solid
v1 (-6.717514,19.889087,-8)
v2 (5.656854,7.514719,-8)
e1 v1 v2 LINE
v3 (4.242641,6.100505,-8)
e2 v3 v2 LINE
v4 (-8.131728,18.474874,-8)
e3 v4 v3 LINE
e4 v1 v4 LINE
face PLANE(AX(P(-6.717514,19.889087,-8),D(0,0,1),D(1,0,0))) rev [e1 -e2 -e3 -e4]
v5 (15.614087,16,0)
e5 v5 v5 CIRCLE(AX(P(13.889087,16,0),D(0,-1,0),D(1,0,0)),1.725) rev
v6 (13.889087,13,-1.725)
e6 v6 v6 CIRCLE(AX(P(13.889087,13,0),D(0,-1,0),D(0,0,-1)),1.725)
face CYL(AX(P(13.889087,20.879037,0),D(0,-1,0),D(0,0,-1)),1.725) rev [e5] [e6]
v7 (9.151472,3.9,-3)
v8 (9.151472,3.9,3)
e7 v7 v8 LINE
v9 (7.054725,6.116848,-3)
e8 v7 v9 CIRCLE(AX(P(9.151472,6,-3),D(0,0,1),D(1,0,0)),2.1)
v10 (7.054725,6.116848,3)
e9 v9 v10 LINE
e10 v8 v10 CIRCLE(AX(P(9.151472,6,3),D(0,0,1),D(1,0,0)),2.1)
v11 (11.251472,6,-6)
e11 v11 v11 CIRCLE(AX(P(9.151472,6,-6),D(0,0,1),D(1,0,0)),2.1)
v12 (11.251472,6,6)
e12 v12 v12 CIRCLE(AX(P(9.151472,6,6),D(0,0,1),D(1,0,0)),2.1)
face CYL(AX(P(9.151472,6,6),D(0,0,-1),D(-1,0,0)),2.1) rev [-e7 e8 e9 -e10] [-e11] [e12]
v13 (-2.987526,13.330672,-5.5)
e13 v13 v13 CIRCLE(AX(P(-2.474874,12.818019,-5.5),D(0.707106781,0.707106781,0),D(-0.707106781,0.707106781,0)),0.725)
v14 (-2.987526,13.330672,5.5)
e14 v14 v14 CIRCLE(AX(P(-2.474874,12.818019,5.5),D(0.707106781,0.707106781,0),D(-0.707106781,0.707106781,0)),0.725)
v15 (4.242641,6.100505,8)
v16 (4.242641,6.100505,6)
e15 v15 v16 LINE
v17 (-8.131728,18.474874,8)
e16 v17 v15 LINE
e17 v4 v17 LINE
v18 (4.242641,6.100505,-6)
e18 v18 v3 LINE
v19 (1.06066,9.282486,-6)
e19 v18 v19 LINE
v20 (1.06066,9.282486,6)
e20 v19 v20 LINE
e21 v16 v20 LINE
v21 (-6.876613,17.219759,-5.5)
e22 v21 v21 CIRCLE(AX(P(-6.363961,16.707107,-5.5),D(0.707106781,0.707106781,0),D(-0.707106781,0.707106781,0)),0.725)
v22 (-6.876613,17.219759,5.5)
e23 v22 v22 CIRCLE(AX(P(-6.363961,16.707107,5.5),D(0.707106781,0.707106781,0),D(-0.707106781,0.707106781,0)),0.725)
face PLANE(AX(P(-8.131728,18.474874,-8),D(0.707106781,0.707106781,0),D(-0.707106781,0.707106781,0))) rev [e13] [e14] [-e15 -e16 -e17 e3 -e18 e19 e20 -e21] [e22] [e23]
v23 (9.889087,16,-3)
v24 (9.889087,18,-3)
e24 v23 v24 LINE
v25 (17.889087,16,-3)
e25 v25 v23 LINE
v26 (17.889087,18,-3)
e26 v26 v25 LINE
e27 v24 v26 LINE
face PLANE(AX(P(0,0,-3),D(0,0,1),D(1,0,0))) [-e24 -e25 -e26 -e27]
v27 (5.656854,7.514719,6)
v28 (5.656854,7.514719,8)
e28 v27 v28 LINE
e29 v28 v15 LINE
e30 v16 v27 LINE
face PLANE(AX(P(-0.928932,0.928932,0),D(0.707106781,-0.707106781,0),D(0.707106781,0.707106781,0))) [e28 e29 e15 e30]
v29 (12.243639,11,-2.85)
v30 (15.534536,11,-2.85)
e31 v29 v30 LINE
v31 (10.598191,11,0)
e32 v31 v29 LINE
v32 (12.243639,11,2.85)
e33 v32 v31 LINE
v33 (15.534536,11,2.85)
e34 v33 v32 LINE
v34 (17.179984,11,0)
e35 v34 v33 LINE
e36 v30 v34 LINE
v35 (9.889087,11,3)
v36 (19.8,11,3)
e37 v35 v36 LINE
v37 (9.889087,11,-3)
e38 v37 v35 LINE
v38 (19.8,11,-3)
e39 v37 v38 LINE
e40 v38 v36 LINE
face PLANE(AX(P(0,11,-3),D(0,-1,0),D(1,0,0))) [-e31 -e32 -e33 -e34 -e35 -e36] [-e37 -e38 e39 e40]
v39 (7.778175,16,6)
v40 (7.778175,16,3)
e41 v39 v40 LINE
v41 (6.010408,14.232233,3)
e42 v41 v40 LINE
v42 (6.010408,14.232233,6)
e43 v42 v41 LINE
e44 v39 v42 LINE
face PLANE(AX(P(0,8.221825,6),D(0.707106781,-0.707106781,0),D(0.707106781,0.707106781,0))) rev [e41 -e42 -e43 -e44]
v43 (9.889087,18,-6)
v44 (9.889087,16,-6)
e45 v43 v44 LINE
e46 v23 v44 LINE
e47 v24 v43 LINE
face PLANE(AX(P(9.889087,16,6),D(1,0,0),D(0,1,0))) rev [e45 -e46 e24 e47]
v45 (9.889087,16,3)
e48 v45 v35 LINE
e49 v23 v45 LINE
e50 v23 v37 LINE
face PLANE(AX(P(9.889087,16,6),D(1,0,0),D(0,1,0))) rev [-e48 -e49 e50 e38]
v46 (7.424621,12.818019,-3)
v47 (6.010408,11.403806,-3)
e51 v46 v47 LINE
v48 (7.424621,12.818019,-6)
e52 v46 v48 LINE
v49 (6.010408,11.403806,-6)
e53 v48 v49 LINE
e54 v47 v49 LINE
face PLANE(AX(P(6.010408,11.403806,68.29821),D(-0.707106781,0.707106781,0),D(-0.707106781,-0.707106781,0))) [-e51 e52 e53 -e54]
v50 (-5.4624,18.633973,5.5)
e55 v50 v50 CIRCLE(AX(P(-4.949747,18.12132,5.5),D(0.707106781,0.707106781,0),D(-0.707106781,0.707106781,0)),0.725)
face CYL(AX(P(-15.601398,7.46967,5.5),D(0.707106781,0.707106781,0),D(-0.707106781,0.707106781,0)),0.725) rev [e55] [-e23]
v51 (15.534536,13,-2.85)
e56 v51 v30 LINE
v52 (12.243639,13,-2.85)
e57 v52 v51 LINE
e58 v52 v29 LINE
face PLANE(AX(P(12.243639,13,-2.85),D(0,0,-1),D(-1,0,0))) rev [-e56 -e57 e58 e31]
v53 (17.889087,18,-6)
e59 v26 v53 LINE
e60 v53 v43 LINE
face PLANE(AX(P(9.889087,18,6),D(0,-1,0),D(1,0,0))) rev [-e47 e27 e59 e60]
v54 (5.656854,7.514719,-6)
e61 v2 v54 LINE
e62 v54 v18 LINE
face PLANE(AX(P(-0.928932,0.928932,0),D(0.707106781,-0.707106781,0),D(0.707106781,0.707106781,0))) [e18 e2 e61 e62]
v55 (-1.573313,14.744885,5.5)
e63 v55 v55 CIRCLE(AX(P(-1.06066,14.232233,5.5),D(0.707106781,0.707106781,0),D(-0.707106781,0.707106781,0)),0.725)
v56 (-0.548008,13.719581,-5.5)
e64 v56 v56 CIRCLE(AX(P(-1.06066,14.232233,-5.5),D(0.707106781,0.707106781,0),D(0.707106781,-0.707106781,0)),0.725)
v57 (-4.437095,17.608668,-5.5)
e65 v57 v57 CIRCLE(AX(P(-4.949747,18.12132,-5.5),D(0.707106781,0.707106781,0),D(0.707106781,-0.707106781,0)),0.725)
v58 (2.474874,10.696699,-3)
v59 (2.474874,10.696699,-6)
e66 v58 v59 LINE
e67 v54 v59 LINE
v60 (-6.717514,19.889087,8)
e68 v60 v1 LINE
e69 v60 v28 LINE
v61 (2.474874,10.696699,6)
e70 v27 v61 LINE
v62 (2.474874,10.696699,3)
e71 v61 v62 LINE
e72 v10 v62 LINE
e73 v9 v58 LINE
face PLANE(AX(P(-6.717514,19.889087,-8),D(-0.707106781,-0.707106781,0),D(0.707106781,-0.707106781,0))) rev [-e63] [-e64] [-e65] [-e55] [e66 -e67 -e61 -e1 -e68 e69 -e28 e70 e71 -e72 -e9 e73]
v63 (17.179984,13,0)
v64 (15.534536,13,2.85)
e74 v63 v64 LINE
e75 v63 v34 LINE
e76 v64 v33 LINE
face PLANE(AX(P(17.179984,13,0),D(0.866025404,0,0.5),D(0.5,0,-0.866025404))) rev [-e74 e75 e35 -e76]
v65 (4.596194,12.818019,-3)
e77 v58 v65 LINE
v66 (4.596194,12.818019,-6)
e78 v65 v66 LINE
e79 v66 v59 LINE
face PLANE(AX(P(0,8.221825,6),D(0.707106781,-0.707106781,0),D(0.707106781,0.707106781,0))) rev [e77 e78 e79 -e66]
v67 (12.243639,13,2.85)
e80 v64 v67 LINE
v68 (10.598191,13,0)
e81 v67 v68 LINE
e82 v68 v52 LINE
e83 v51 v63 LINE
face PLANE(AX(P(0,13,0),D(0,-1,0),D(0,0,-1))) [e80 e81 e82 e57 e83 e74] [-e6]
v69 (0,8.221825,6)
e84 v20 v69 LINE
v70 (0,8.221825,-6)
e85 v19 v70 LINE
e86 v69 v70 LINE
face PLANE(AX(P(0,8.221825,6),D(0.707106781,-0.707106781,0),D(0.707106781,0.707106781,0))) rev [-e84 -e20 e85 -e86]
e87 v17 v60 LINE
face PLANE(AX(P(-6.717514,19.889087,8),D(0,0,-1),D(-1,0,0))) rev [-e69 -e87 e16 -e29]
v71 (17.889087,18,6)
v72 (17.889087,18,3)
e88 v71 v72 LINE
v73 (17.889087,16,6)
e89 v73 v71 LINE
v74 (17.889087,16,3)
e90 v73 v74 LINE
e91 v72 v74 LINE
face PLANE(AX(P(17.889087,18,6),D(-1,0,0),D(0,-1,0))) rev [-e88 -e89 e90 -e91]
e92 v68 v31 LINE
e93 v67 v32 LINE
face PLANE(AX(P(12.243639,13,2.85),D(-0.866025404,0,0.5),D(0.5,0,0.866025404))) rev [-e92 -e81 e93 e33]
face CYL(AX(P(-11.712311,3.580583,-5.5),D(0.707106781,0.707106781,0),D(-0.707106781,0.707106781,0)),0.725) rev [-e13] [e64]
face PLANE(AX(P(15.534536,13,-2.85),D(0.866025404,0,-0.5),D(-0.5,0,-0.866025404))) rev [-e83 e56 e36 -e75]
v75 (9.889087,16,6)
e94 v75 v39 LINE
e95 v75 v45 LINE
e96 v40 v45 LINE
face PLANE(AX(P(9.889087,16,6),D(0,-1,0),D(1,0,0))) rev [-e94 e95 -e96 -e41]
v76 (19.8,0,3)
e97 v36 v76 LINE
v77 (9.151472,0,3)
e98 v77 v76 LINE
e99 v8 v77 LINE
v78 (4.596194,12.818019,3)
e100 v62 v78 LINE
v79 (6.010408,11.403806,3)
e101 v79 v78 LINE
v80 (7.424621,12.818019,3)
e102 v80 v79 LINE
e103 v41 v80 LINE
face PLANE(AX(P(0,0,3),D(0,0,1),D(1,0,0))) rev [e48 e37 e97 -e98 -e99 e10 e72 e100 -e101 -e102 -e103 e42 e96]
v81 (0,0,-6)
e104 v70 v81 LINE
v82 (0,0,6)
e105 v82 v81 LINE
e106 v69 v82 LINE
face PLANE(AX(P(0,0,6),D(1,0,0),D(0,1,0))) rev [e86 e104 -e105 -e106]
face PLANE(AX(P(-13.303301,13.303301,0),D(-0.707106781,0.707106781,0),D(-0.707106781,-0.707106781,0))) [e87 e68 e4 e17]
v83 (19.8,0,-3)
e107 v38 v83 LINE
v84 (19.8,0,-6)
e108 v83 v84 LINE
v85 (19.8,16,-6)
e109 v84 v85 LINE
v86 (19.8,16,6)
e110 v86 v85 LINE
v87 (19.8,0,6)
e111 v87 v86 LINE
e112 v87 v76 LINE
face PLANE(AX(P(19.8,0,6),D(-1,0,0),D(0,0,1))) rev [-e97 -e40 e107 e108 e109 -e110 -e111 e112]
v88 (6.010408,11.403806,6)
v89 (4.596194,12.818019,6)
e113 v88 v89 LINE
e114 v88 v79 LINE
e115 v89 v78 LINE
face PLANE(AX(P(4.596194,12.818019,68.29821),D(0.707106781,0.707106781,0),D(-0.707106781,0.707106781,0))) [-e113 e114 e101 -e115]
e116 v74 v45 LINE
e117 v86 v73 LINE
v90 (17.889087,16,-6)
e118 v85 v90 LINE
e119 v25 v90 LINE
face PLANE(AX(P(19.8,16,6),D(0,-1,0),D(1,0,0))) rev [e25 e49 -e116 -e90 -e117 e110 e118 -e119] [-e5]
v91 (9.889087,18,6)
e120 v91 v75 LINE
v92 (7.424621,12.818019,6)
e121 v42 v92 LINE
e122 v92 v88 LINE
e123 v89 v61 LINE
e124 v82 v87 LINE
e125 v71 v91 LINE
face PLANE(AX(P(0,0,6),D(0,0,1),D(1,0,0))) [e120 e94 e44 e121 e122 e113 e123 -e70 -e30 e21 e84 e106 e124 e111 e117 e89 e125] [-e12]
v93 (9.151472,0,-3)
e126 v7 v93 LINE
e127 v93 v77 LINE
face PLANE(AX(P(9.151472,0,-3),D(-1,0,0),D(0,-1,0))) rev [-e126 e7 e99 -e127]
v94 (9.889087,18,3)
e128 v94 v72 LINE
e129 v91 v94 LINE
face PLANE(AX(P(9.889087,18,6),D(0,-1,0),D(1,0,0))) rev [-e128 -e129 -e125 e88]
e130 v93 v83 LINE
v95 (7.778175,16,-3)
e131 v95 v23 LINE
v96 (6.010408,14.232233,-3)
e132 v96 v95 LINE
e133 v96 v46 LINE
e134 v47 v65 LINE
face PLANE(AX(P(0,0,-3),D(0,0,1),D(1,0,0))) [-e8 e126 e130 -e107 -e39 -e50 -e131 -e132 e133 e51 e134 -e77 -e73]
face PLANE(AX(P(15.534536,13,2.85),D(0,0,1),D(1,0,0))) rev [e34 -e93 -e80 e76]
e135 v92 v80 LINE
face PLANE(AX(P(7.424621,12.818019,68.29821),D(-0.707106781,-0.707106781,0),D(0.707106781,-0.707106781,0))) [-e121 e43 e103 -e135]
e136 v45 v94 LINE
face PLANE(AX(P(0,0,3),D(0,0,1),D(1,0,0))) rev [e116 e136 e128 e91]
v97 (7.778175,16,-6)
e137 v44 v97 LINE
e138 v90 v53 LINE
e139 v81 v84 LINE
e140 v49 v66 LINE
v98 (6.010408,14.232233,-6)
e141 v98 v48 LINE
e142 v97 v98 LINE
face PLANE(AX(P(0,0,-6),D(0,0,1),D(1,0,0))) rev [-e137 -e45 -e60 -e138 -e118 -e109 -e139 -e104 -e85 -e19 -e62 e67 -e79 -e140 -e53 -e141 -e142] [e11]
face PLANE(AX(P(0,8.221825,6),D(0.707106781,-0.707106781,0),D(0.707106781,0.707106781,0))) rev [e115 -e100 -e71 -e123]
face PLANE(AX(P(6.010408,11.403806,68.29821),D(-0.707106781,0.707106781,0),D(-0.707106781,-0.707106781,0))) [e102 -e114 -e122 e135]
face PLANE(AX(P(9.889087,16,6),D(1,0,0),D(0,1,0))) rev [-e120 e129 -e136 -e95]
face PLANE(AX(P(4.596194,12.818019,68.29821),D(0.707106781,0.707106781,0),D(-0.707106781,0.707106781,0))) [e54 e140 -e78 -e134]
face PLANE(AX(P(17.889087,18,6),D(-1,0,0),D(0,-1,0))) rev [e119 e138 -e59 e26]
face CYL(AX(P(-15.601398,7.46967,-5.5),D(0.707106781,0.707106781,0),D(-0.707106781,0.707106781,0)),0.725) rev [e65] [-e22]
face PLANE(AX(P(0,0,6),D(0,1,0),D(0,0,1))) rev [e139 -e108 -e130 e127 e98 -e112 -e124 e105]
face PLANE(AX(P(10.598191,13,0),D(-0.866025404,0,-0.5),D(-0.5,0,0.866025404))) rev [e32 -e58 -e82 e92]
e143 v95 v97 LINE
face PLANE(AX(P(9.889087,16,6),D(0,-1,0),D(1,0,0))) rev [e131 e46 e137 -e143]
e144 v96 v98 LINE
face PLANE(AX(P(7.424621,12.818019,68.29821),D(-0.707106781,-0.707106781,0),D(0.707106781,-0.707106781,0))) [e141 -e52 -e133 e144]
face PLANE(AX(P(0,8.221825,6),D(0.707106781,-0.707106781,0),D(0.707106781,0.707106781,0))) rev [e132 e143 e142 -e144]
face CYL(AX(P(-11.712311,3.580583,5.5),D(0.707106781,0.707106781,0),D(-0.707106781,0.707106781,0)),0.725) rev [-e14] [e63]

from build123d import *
from build123d.topology import SkipClean

# Parameters (mm, degrees)
SKETCH1_R                        = 2.1
FINGER_BASE_1_DEPTH              = 6
SKETCH2_W                        = 16
SKETCH2_H                        = 2
FLEXURE_JOINT_BASE_DEPTH         = 13
SKETCH3_W                        = 8
SKETCH3_H                        = 2
PULLEY_HOUSING_DEPTH             = 3
M3_NUT_DEPTH                     = 2
SKETCH5_R                        = 1.725
M3_HOLE_DEPTH                    = 3
SKETCH9_W                        = 2
SKETCH9_H                        = 2
SUPPORT_FLEXURE_JOINT_BASE_DEPTH = 4.5
SKETCH10_R                       = 0.725
HOLE_FOR_STICHING_DEPTH          = 22.391190815
CUT_EXTRUDE1_DEPTH               = 32.362649657
CUT_EXTRUDE1_DEPTH_BACK          = 32.362649657


with BuildPart() as part:
    # Sketch1 → Finger Base 1 (new, symmetric)
    with BuildSketch(Plane.XY):
        Polygon((0, 8.221825407), (7.778174593, 16), (9.889087297, 16), (9.889087297, 18), (17.889087297, 18), (17.889087297, 16), (19.8, 16), (19.8, 0), (0, 0), align=None)
        with Locations((9.151471863, 6)):
            Circle(SKETCH1_R, mode=Mode.SUBTRACT)
    extrude(amount=FINGER_BASE_1_DEPTH, both=True)

    # Sketch2 → Flexure Joint Base (add)
    with BuildSketch(Plane(origin=(-4.110912703, 4.110912703, 0), x_dir=(0, 0, 1), z_dir=(-0.7071067811865462, 0.707106781186549, 0))):
        with Locations((0, 8.313708499)):
            Rectangle(SKETCH2_W, SKETCH2_H)
    extrude(amount=FLEXURE_JOINT_BASE_DEPTH)

    # Sketch3 → Pulley Housing (cut, symmetric)
    with SkipClean():  # the faces are left unmerged after this step: merging them gives an invalid solid
        with BuildSketch(Plane.XY):
            with BuildLine():
                ThreePointArc((7.054725188, 6.116847687), (7.62579494, 4.556978889), (9.151471863, 3.9))
                Line((9.151471863, 3.9), (9.151471863, 0))
                Line((9.151471863, 0), (19.8, 0))
                Line((19.8, 0), (19.8, 11))
                Line((19.8, 11), (9.889087297, 11))
                Line((9.889087297, 11), (9.889087297, 16))
                Line((9.889087297, 16), (7.778174593, 16))
                Line((7.778174593, 16), (2.474873734, 10.696699141))
                Line((2.474873734, 10.696699141), (7.054725188, 6.116847687))
            make_face()
            with Locations((13.889087297, 17)):
                Rectangle(SKETCH3_W, SKETCH3_H)
        extrude(amount=PULLEY_HOUSING_DEPTH, both=True, mode=Mode.SUBTRACT)
    add(part.part.scale(1), mode=Mode.REPLACE)  # the faces are merged on a copy

    # Sketch4 → M3 Nut (cut)
    with BuildSketch(Plane.XZ.offset(-11)):
        Polygon((10.598190762, 0), (12.243639029, -2.85), (15.534535564, -2.85), (17.179983831, 0), (15.534535564, 2.85), (12.243639029, 2.85), align=None)
    extrude(amount=-M3_NUT_DEPTH, mode=Mode.SUBTRACT)

    # Sketch5 → M3 Hole (cut)
    with BuildSketch(Plane.XZ.offset(-13)):
        with Locations(Location((13.889087297, 0, 0), (0, 0, 270))):
            Circle(SKETCH5_R)
    extrude(amount=-M3_HOLE_DEPTH, mode=Mode.SUBTRACT)

    # Sketch9 → Support Flexure Joint Base (add)
    with BuildSketch(Plane(origin=(-4.110912703, 4.110912703, 0), x_dir=(0, 0, -1), z_dir=(0.7071067811865462, -0.7071067811865488, 0))):
        with Locations((-7, 8.313708499)):
            Rectangle(SKETCH9_W, SKETCH9_H)
        with Locations((7, 8.313708499)):
            Rectangle(SKETCH9_W, SKETCH9_H)
    extrude(amount=SUPPORT_FLEXURE_JOINT_BASE_DEPTH)

    # Sketch10 → Hole For Stiching (cut, through all)
    with BuildSketch(Plane(origin=(6.585786438, 6.585786438, 0), x_dir=(0.7071067811865462, -0.707106781186549, 0), z_dir=(0.707106781186549, 0.7071067811865462, 0))):
        with Locations(Location((-16.313708499, -5.5, 0), (0, 0, 180))):
            Circle(SKETCH10_R)
        with Locations(Location((-10.813708499, -5.5, 0), (0, 0, 180))):
            Circle(SKETCH10_R)
        with Locations(Location((-10.813708499, 5.5, 0), (0, 0, 180))):
            Circle(SKETCH10_R)
        with Locations(Location((-16.313708499, 5.5, 0), (0, 0, 180))):
            Circle(SKETCH10_R)
    extrude(amount=-HOLE_FOR_STICHING_DEPTH, mode=Mode.SUBTRACT)

    # Sketch11 → Cut-Extrude1 (cut, two sides: drawn at the far end of the back side and taken through both)
    with BuildSketch(Plane.XY.offset(6).offset(-CUT_EXTRUDE1_DEPTH_BACK)):
        Polygon((-30.849385448, 48.263599011), (4.596194078, 12.818019485), (6.01040764, 11.403805922), (7.424621202, 12.818019485), (6.01040764, 14.232233047), (-29.435171886, 49.677812573), (-100.326330938, 120.568971625), (-101.7405445, 119.154758062), align=None)
    extrude(amount=CUT_EXTRUDE1_DEPTH + CUT_EXTRUDE1_DEPTH_BACK, mode=Mode.SUBTRACT)


solid = part.part
